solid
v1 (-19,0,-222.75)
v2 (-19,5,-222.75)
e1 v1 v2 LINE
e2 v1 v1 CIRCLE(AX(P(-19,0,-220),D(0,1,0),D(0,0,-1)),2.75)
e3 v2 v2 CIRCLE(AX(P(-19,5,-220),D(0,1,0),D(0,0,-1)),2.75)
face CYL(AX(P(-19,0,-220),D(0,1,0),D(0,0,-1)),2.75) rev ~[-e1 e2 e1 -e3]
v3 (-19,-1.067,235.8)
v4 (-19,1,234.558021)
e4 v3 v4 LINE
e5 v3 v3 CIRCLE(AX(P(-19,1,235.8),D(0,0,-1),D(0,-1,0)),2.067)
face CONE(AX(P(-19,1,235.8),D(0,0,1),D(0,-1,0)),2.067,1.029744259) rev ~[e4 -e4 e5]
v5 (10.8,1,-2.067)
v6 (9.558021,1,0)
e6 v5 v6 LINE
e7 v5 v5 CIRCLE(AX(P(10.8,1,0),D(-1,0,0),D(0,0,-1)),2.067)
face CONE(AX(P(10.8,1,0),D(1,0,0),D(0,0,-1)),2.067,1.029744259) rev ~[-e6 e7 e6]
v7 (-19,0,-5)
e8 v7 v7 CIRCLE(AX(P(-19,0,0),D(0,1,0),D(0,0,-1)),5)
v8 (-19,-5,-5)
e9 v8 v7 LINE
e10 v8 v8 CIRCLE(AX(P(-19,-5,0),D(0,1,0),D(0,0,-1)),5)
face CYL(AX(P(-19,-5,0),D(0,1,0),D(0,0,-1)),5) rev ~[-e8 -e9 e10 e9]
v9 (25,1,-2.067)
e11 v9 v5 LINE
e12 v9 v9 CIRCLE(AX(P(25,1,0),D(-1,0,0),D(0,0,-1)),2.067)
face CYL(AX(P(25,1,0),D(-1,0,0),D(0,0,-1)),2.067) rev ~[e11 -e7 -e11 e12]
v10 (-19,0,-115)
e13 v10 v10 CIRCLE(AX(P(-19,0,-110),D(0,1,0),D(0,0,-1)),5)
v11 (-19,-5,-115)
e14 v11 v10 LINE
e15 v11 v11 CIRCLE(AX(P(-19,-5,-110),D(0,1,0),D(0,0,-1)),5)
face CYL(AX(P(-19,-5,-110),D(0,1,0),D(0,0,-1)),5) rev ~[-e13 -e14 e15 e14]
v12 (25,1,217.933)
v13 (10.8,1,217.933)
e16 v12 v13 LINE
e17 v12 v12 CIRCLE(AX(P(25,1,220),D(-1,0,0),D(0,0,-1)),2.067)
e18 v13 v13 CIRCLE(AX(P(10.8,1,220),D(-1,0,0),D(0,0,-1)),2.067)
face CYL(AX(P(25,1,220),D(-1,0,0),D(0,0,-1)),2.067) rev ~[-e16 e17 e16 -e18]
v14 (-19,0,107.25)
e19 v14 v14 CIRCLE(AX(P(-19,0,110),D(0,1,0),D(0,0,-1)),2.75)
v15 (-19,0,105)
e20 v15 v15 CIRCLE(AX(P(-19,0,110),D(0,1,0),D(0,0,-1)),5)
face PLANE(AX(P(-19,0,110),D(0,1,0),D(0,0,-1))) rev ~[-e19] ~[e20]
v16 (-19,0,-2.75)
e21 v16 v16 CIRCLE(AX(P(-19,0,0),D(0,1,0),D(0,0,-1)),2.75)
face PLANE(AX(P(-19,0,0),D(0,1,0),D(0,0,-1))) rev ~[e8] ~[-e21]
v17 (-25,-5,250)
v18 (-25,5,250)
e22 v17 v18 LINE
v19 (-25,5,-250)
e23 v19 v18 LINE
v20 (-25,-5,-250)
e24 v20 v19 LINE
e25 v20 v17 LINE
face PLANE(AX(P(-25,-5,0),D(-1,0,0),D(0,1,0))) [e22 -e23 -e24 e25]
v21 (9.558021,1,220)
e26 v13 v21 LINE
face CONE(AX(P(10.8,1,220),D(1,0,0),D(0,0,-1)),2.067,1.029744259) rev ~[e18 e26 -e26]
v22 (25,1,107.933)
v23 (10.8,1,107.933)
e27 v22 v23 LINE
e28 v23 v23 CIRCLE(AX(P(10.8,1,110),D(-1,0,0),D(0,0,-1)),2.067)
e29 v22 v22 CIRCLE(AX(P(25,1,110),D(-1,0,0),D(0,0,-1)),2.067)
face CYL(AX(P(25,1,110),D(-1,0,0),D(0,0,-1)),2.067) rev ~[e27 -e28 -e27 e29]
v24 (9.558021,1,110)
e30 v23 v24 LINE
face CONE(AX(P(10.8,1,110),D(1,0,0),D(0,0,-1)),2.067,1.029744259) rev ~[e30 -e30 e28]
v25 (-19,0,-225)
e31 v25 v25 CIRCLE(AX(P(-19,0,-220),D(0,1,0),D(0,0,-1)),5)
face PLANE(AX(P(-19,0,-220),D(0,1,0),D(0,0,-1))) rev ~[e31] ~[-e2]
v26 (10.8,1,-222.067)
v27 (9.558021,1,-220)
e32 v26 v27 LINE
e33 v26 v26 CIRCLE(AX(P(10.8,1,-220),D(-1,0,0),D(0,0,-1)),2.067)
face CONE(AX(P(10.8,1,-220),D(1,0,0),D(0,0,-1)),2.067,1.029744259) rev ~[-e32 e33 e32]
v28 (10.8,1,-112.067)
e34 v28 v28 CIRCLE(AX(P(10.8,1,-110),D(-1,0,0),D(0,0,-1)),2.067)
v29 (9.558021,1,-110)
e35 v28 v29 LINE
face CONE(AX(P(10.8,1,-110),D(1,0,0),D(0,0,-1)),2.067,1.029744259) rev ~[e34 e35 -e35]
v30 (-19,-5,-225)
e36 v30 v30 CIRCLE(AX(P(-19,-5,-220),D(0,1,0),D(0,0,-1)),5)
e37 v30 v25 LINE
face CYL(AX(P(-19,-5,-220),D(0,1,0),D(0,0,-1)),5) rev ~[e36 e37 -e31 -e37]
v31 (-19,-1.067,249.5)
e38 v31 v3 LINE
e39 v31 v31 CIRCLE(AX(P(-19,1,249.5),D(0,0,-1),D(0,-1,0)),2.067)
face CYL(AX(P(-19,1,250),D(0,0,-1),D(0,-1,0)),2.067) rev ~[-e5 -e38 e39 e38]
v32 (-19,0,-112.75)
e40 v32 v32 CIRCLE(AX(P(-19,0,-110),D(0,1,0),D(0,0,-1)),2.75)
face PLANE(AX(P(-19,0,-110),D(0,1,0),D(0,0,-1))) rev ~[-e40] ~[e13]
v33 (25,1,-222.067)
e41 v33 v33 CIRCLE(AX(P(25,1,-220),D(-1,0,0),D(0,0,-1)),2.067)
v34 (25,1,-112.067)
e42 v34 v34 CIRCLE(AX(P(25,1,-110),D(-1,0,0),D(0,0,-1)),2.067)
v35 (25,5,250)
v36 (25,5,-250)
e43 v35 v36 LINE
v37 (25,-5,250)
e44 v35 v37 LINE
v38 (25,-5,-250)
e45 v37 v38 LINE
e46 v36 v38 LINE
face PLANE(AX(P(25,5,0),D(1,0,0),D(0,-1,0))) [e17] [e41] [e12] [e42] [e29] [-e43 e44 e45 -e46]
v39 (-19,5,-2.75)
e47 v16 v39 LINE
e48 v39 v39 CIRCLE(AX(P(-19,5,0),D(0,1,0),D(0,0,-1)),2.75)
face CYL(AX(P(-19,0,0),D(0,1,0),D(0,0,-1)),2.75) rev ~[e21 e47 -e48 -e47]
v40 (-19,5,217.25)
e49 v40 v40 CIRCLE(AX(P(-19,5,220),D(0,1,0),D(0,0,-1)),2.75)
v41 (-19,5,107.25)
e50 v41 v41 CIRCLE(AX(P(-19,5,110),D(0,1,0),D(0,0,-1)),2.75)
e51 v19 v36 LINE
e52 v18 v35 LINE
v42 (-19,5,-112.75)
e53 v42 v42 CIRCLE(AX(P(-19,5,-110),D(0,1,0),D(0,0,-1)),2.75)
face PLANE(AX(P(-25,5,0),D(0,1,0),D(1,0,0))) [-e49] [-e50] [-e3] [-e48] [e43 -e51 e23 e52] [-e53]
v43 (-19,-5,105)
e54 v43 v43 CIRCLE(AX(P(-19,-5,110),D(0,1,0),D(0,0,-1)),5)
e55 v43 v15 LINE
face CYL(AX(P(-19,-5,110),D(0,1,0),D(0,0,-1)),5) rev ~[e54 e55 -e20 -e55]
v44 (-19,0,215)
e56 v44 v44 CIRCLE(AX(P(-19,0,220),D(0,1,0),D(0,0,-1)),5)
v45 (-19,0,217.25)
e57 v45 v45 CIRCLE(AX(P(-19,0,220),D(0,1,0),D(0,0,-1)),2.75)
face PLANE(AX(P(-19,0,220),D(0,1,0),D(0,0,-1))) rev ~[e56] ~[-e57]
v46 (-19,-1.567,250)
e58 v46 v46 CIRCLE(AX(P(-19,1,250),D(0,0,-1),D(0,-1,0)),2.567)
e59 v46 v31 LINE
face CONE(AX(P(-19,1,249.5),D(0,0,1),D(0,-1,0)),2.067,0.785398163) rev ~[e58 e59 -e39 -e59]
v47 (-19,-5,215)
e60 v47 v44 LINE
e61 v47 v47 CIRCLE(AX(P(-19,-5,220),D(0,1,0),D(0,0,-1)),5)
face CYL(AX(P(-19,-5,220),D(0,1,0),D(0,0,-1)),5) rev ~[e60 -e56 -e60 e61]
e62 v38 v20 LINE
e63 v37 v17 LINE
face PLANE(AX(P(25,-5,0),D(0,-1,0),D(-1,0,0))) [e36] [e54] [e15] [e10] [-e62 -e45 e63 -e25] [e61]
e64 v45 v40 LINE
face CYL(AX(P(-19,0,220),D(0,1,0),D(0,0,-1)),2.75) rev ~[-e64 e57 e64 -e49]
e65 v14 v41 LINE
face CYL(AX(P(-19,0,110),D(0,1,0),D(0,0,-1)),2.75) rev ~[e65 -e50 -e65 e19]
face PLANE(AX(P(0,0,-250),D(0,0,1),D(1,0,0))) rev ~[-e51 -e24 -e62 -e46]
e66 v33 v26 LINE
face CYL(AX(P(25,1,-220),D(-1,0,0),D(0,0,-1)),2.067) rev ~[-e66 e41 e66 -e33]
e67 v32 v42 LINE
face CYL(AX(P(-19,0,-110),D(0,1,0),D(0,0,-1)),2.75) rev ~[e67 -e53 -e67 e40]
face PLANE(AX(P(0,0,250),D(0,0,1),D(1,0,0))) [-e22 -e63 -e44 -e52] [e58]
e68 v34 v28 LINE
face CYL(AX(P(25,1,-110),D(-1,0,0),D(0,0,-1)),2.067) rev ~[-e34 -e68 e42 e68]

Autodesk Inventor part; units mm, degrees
ref_plane "YZ Plane" through (0, 0, 0) normal (1, 0, 0) x (0, 1, 0)
ref_plane "XZ Plane" through (0, 0, 0) normal (0, 1, 0) x (-1, 0, 0)
ref_plane "XY Plane" through (0, 0, 0) normal (0, 0, 1) x (1, 0, 0)
sketch "Skizze1" plane through (0, 0, 0) normal (0, 0, 1) x (1, 0, 0)
  line L0 (-25, 5) -> (25, 5)
  line L1 (25, 5) -> (25, -5)
  line L2 (25, -5) -> (-25, -5)
  line L3 (-25, -5) -> (-25, 5)
  line L4 (-25, 5) -> (25, -5) construction
  line L5 (25, 5) -> (-25, -5) construction
  point P0 (0, 0)
  dimension "d0" = 50
  dimension "d1" = 10
extrude "Extrusion1" add sketch "Skizze1" along normal mid plane 500
sketch "Skizze4" plane through (-25, -5, 250) normal (0, -1, 0) x (1, 0, 0)
  line L0 (50, -500) -> (50, 0) projected
  line L1 (0, 0) -> (50, 0) projected
  line L2 (0, 0) -> (0, -500) projected
  line L3 (50, -500) -> (0, -500) projected
  point P0 (25, -250)
  point P1 (30, -465)
  dimension "d13" = 30
  dimension "d14" = 35
hole "Bohrung2" [suppressed]
sketch "Skizze5" plane through (-25, -5, 250) normal (0, -1, 0) x (1, 0, 0)
  line L0 (50, -500) -> (50, 0) projected
  line L1 (0, 0) -> (50, 0) projected
  line L2 (0, 0) -> (0, -500) projected
  line L3 (50, -500) -> (0, -500) projected
  point P0 (25, -250)
  point P1 (6, -250)
  point P2 (0, -250)
  dimension "d22" = 6
hole "Bohrung3" at (-19, -5, 0) direction (0, 1, 0) diameter 5.5 depth 32.3 tip angle 118 counterbore diameter 10 counterbore depth 5
pattern_linear "Rechteckige Anordnung1" count 3 spacing 110 along (0, 0, -1) count 3 spacing 110 along (0, 0, 1) of "Bohrung3"
sketch "Skizze6" plane through (25, 5, 250) normal (1, 0, 0) x (0, 0, -1)
  line L0 (500, 0) -> (0, 0) projected
  line L1 (0, -10) -> (0, 0) projected
  line L2 (500, -10) -> (0, -10) projected
  line L3 (500, 0) -> (500, -10) projected
  point P0 (250, -5)
  point P1 (250, -4)
  dimension "d60" = 6
hole "Bohrung4" at (25, 1, 0) direction (-1, 0, 0) diameter 4.134 depth 14.2 tip angle 118 thread size "M5x0.8" class "6H" standard "ISO Metric profile"
pattern_linear "Rechteckige Anordnung2" count 3 spacing 110 along (0, 0, 1) count 3 spacing 110 along (0, 0, -1) of "Bohrung4"
sketch "Skizze7" plane through (0, 0, 250) normal (0, 0, 1) x (1, 0, 0)
  line L0 (-21.75, 5) -> (-21.75, 0) projected
  line L1 (-25, 5) -> (-25, -5) projected
  line L2 (25, 5) -> (-25, 5) projected
  point P0 (0, 0)
  point P1 (-19, 1)
  dimension "d49" = 6
  dimension "d61" = 4
hole "Bohrung5" at (-19, 1, 250) direction (0, 0, -1) diameter 4.134 depth 14.2 tip angle 118 thread size "M5x0.8" class "6H" standard "ISO Metric profile"
chamfer "Fasen1" distance 0.5 angle 45 1 edges at (-19, 3.067, 250)
properties part number "Platte-2"
